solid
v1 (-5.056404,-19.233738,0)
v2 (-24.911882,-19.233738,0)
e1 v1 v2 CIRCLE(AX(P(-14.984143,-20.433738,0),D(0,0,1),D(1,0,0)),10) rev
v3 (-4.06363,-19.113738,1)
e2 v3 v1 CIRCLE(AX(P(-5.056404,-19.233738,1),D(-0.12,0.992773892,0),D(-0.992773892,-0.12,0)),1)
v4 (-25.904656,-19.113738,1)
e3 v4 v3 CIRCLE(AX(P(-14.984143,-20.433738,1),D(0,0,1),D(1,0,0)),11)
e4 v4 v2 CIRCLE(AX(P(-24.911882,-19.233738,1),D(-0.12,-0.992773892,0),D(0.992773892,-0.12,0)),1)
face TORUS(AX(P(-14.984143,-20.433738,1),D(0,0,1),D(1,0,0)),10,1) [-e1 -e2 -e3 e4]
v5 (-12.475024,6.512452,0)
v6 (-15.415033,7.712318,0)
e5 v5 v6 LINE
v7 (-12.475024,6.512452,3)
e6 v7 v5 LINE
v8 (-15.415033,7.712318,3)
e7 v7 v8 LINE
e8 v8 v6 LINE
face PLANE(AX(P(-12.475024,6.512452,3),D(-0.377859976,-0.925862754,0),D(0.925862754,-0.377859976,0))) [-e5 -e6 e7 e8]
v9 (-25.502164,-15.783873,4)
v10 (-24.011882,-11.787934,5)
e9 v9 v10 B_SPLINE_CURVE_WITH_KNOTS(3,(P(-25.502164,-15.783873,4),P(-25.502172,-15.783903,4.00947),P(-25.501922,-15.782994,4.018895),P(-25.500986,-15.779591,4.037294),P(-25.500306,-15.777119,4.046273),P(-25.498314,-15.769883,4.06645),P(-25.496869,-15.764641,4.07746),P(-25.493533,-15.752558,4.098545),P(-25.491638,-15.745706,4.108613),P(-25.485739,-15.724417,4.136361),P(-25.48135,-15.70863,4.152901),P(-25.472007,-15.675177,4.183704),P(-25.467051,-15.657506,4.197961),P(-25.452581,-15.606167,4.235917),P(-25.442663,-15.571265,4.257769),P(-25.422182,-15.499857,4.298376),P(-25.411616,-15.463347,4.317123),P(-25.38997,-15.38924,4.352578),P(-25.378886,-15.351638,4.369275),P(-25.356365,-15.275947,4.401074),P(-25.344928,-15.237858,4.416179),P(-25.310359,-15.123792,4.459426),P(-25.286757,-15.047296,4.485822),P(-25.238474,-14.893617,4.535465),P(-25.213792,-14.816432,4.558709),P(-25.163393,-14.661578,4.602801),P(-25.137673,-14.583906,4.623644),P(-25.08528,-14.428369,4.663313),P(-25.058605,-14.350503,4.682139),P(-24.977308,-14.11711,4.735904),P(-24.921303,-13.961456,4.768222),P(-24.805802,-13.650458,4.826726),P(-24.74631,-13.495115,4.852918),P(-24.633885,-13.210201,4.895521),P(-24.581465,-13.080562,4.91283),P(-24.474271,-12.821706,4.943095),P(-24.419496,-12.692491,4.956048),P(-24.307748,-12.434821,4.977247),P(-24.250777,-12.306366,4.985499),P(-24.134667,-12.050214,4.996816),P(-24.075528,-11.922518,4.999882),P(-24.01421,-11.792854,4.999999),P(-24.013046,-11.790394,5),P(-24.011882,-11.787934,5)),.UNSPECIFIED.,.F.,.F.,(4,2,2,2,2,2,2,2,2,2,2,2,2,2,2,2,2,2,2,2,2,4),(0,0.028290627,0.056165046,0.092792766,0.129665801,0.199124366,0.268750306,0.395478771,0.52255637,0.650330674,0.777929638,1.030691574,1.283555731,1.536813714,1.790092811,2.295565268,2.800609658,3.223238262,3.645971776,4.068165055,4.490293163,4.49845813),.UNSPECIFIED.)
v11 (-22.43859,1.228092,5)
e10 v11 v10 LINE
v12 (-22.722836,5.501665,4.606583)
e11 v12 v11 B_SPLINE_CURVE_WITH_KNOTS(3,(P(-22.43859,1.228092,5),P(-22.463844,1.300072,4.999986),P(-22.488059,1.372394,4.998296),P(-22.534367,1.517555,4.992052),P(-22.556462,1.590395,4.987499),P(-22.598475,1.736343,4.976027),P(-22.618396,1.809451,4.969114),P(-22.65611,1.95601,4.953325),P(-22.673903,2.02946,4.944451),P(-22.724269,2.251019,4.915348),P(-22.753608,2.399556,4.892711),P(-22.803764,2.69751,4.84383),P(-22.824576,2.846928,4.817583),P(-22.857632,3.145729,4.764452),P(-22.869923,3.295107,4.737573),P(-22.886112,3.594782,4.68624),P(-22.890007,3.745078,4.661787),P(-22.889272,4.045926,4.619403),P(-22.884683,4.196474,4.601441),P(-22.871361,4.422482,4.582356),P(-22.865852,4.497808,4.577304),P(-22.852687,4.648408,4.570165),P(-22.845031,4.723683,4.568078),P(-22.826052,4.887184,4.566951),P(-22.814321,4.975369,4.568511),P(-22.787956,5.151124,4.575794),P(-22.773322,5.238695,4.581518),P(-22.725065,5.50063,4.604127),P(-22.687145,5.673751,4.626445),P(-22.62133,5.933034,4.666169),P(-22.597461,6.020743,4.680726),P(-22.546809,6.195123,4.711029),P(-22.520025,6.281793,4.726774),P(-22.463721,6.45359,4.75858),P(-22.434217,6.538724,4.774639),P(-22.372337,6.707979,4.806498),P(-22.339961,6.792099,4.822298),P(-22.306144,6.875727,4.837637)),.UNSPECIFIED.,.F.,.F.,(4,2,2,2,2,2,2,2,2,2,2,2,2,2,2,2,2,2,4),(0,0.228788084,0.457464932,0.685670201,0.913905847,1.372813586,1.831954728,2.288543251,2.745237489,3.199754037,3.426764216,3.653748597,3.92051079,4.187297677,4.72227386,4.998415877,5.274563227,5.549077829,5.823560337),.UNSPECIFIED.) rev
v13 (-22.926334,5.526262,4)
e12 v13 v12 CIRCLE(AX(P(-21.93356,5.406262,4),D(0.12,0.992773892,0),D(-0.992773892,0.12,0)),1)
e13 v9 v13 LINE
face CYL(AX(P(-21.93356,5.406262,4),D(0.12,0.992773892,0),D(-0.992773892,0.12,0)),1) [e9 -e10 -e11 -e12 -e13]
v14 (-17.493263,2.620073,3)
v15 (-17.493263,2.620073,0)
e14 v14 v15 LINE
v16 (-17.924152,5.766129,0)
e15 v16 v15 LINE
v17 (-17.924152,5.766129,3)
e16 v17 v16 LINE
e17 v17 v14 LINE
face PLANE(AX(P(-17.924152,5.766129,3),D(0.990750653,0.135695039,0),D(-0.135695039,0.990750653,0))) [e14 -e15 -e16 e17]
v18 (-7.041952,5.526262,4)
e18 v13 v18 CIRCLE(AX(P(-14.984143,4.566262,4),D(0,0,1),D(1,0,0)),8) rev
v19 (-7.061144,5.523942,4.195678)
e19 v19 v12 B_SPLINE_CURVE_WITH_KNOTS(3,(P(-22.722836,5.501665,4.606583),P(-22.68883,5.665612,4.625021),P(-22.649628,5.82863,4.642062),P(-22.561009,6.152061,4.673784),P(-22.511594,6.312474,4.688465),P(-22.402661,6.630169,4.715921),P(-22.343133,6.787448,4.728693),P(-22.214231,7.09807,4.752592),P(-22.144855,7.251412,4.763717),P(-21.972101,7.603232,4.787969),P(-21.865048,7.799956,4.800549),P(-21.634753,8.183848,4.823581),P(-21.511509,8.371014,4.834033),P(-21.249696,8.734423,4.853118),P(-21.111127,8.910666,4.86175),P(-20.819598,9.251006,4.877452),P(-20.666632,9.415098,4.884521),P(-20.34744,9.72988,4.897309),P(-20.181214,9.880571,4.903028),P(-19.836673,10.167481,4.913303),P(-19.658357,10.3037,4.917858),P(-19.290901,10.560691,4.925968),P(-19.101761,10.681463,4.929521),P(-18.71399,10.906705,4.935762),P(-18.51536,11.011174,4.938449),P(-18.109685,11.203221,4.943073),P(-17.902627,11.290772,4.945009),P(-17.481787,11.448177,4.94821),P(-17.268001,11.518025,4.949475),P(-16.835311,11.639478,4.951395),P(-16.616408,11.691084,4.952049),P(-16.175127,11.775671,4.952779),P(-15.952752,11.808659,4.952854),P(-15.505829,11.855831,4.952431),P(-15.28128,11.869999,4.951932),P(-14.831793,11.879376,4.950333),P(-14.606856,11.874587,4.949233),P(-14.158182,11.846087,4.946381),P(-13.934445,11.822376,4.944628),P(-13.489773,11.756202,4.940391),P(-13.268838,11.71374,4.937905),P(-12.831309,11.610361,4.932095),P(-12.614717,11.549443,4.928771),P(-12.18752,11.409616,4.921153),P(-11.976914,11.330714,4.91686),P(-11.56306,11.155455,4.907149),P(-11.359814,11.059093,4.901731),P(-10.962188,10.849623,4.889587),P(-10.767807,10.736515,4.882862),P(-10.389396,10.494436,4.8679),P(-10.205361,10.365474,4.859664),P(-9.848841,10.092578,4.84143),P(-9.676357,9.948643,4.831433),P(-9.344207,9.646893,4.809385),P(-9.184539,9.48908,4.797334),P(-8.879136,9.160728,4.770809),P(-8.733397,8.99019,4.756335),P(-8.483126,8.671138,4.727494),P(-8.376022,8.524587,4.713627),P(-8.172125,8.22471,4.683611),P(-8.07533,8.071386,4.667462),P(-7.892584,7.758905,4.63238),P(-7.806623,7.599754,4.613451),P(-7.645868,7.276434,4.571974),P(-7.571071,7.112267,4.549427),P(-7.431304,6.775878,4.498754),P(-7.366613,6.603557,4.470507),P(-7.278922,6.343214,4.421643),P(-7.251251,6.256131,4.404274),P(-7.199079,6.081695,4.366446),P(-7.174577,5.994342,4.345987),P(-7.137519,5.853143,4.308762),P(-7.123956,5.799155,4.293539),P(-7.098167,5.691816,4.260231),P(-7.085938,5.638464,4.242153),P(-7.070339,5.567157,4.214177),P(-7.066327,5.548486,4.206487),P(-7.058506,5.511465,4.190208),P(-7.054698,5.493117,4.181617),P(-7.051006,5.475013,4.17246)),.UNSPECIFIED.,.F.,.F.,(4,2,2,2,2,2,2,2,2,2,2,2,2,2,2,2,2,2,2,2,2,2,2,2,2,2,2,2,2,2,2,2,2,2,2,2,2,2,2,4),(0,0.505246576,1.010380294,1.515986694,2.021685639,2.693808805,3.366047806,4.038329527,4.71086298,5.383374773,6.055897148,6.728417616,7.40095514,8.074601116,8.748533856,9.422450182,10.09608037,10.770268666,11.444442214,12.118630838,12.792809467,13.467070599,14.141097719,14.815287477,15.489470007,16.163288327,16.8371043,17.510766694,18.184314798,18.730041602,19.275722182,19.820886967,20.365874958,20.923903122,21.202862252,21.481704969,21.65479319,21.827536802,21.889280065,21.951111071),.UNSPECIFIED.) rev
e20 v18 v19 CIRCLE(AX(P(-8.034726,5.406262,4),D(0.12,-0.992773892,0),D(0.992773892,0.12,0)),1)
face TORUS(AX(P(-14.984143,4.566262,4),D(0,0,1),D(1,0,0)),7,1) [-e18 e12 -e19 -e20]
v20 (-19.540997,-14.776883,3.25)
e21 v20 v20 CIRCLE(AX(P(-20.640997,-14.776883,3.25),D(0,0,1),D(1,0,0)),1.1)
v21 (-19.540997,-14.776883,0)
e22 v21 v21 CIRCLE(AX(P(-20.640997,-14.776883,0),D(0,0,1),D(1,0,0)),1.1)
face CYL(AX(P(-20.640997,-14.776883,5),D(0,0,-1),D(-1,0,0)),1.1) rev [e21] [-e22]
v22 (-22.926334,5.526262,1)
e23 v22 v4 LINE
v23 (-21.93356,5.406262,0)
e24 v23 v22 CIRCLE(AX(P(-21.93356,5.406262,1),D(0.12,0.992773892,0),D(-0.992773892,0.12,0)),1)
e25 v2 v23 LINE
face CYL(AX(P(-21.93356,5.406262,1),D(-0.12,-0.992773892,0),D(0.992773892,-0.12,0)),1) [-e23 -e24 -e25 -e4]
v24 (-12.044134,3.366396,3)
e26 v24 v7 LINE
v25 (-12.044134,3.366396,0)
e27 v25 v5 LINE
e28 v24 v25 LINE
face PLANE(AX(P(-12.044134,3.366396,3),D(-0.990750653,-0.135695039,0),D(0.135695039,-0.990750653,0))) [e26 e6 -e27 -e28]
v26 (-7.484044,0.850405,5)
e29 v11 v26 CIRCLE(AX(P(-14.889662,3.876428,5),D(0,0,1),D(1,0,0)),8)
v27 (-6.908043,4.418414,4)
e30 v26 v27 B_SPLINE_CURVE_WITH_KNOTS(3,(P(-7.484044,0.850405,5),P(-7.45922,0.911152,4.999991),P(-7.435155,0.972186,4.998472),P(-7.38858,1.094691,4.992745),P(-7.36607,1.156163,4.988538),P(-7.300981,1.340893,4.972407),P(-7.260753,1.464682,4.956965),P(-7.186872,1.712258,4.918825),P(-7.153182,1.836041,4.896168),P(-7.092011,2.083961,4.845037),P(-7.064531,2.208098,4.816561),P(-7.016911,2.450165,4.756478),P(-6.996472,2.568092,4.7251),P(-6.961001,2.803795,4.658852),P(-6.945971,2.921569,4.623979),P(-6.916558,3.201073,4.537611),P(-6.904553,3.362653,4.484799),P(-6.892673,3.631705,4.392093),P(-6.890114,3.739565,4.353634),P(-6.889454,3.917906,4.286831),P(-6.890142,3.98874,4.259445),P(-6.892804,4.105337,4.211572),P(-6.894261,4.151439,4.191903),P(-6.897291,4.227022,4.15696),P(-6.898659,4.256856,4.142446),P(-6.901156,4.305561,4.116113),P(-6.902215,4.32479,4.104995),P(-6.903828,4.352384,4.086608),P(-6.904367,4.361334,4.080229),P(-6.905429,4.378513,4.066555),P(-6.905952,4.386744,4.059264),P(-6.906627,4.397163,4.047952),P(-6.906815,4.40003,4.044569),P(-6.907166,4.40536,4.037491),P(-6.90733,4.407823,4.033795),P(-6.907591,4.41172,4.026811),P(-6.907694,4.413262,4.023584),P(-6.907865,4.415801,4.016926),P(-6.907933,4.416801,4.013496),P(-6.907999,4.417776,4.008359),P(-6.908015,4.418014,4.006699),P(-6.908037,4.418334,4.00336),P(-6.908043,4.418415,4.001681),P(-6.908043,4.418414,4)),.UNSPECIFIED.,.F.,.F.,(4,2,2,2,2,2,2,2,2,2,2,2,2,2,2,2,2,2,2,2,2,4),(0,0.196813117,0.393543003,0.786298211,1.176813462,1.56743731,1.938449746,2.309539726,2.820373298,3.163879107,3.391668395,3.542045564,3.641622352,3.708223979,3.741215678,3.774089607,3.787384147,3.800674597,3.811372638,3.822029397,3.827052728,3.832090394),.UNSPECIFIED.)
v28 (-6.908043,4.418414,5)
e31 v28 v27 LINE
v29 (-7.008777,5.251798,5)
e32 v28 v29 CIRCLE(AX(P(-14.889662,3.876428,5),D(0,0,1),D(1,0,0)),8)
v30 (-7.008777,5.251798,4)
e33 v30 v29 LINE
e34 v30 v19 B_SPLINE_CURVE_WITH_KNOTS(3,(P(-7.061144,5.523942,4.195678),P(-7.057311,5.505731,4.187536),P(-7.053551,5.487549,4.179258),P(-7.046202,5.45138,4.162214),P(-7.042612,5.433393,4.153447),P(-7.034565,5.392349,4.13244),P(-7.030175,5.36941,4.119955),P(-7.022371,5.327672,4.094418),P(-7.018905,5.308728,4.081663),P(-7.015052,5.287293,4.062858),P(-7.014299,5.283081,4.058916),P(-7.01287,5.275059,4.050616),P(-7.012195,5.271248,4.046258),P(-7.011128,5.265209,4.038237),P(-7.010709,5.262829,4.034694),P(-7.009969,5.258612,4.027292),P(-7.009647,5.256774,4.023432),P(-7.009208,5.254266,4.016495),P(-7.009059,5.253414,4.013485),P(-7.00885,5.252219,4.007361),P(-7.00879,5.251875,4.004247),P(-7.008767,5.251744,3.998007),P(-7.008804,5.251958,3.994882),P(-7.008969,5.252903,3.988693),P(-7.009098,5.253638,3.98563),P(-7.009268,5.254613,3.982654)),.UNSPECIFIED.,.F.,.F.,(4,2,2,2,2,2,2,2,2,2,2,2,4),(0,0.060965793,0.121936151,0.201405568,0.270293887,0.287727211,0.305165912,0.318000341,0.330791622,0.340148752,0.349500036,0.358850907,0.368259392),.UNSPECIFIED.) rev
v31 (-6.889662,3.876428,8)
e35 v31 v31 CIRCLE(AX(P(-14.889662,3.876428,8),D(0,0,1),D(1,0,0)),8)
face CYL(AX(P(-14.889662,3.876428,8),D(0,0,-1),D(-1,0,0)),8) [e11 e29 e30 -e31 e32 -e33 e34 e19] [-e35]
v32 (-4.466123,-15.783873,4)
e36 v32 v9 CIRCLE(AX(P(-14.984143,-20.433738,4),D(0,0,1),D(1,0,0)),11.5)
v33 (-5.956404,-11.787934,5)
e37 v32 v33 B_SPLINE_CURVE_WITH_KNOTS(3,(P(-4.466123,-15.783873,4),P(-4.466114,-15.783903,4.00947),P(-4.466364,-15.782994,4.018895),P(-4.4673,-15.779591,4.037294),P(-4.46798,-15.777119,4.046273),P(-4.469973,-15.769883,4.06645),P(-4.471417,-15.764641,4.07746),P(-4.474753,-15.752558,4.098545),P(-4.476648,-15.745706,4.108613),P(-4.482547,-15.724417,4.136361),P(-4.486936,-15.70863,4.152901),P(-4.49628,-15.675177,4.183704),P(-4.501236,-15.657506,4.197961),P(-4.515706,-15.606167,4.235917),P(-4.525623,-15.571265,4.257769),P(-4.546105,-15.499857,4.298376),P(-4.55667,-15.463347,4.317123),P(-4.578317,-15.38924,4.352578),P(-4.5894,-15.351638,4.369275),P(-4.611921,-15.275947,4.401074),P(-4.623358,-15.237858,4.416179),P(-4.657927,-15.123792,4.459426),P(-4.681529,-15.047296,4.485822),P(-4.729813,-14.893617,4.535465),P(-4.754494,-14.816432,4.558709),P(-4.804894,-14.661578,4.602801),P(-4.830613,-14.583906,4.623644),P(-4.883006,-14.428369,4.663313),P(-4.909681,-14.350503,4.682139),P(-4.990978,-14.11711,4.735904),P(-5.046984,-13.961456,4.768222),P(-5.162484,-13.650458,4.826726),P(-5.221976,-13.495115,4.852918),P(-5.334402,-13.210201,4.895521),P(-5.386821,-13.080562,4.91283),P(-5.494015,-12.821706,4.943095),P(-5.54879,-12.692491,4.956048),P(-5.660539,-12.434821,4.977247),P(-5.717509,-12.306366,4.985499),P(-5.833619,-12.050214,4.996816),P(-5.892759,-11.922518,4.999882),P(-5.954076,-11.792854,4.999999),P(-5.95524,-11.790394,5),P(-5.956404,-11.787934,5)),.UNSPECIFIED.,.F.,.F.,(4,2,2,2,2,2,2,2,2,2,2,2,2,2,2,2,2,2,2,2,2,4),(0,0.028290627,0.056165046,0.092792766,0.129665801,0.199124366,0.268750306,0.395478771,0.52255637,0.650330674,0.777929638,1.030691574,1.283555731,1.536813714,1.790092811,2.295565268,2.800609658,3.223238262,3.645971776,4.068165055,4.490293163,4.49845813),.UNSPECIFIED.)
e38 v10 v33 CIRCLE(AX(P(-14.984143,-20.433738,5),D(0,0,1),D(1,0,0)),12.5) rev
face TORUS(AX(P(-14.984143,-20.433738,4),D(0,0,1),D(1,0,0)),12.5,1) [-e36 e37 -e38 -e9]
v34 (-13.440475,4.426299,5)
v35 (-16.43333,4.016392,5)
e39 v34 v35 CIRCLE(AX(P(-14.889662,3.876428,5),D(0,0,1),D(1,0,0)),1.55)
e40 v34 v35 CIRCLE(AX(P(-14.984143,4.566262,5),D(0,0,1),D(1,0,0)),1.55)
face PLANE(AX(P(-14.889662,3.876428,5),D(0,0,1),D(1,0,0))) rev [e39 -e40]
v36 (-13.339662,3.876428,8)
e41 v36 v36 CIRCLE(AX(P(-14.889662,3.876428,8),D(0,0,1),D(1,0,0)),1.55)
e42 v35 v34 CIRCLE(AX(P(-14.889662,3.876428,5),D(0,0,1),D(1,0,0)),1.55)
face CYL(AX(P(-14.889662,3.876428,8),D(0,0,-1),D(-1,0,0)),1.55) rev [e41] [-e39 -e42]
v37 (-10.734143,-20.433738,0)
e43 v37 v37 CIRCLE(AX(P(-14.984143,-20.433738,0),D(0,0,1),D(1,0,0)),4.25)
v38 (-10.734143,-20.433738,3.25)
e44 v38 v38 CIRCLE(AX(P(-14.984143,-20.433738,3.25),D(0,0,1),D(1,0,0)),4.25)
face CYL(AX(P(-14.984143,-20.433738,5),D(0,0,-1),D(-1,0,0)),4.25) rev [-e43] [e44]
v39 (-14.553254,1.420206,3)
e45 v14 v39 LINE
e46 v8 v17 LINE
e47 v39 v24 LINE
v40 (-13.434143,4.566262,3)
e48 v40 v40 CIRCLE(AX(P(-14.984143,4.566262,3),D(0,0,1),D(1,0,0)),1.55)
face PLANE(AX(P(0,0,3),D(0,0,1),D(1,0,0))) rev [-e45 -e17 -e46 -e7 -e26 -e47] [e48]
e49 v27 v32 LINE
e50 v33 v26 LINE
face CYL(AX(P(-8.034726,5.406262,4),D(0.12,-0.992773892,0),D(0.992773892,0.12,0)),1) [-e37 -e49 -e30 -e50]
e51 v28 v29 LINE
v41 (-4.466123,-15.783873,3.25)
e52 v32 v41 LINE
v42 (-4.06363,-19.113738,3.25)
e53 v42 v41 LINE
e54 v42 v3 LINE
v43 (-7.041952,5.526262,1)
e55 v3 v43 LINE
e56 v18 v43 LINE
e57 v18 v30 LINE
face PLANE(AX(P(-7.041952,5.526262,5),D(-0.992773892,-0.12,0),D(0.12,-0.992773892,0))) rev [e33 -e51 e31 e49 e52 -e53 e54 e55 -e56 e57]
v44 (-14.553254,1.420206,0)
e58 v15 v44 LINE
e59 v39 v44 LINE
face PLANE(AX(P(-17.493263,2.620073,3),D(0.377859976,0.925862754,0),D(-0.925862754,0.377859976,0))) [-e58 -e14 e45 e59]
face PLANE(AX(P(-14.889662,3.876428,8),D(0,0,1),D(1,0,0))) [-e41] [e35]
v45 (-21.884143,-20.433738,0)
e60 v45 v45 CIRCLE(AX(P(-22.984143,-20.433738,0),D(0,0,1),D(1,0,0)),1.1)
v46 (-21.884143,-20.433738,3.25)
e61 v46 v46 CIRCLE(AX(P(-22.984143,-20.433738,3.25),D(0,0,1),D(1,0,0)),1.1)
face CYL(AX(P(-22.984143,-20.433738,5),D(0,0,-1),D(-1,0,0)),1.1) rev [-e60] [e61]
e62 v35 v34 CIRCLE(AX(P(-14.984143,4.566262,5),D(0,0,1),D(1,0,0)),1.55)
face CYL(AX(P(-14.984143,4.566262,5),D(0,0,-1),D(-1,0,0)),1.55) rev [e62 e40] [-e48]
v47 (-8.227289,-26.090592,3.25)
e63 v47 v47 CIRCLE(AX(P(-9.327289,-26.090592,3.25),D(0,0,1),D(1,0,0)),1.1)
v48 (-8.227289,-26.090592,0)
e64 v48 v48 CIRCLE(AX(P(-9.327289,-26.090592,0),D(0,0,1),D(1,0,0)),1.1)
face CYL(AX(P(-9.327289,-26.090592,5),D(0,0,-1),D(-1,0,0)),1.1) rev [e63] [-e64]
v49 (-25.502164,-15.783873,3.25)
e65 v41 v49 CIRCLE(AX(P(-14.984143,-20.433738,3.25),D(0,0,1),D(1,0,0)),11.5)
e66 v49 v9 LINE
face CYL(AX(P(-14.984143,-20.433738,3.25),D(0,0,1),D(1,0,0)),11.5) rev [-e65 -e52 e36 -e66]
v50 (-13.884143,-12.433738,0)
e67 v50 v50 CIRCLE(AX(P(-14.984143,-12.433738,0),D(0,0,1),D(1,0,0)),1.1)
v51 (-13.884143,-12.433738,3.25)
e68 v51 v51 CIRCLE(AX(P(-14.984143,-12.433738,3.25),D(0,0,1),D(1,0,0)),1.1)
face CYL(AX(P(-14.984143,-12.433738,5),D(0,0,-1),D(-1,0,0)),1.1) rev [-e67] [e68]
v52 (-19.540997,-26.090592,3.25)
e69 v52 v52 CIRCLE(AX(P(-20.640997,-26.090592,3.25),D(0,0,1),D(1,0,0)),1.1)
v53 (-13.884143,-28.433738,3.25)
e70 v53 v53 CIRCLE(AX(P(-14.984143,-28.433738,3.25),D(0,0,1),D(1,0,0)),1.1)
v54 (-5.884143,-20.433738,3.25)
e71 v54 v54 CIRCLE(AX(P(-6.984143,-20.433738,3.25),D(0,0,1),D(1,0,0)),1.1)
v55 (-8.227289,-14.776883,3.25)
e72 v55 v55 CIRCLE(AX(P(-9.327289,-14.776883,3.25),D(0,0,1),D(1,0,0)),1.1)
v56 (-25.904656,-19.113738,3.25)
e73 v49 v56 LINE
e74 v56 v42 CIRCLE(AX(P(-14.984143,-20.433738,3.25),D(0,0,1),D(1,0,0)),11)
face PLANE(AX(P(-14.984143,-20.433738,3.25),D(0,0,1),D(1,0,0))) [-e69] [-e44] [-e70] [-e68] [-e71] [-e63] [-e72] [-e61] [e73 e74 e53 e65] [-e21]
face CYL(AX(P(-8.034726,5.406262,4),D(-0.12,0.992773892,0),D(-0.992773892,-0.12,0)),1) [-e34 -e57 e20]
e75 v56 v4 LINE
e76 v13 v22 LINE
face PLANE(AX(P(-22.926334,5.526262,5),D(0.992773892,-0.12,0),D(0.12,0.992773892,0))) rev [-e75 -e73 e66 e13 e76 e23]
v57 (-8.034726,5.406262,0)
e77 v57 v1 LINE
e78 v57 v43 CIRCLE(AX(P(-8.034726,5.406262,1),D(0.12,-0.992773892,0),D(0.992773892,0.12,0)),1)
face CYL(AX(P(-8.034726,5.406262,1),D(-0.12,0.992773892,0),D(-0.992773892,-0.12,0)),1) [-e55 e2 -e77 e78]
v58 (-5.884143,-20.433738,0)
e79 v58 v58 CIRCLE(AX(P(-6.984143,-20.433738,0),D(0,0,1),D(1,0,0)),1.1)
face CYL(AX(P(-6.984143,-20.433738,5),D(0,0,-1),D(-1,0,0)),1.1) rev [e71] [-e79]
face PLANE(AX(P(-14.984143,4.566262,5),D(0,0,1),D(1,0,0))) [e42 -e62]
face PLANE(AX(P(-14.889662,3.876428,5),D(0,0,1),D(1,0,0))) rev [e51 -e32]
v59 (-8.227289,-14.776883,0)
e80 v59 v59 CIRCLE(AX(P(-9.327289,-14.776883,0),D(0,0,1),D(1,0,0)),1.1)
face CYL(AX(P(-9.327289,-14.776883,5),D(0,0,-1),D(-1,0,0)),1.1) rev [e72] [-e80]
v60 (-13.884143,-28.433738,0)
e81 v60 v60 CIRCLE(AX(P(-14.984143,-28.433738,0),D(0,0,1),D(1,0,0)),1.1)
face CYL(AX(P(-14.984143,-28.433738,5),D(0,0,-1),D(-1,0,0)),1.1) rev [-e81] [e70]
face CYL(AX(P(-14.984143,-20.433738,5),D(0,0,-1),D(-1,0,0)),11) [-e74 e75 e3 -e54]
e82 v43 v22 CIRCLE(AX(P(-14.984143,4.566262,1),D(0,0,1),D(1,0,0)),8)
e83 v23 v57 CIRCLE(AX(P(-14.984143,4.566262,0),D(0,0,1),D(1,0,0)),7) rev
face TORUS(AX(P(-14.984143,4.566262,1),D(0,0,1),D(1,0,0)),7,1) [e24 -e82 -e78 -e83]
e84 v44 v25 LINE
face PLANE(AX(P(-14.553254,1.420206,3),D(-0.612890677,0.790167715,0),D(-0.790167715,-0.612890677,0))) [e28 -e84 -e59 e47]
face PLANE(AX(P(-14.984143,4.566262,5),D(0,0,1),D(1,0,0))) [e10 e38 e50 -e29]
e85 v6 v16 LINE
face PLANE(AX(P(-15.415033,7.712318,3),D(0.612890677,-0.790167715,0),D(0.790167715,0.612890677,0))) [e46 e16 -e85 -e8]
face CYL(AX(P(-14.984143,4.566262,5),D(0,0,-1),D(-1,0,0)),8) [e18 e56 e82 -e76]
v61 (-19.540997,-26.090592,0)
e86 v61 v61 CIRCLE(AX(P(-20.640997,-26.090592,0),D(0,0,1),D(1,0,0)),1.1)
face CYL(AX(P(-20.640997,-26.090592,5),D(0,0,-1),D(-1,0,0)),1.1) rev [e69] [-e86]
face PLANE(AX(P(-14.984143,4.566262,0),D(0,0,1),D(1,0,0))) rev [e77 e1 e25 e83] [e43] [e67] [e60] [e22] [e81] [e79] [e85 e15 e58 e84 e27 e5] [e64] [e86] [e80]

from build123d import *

# Parameters (mm, degrees)
SKETCH1_R           = 1.55
SKETCH1_R_2         = 4.25
SKETCH1_R_3         = 1.1
BOSS_EXTRUDE1_DEPTH = 5
SKETCH2_R           = 11.5
CUT_EXTRUDE1_DEPTH  = 1.75
CUT_EXTRUDE2_DEPTH  = 3
SKETCH5_R           = 8
SKETCH5_R_2         = 1.55
BOSS_EXTRUDE2_DEPTH = 3
FILLET1_R           = 1


with BuildPart() as part:
    # Sketch1 → Boss-Extrude1 (new body)
    with BuildSketch(Plane.XY):
        with BuildLine():
            Line((-22.926334266, 5.526262294), (-25.904655941, -19.113737706))
            ThreePointArc((-25.904655941, -19.113737706), (-14.984143133, -31.433737706), (-4.063630324, -19.113737706))
            Line((-4.063630324, -19.113737706), (-7.041951999, 5.526262294))
            ThreePointArc((-7.041951999, 5.526262294), (-14.984143133, 12.566262294), (-22.926334266, 5.526262294))
        make_face()
        with Locations((-14.984143133, 4.566262294)):
            Circle(SKETCH1_R, mode=Mode.SUBTRACT)
        with Locations((-14.984143133, -20.433737706)):
            Circle(SKETCH1_R_2, mode=Mode.SUBTRACT)
        with Locations((-6.984143133, -20.433737706)):
            Circle(SKETCH1_R_3, mode=Mode.SUBTRACT)
        with Locations((-9.327288883, -26.090591955)):
            Circle(SKETCH1_R_3, mode=Mode.SUBTRACT)
        with Locations((-14.984143133, -28.433737706)):
            Circle(SKETCH1_R_3, mode=Mode.SUBTRACT)
        with Locations((-20.640997382, -26.090591955)):
            Circle(SKETCH1_R_3, mode=Mode.SUBTRACT)
        with Locations((-22.984143133, -20.433737706)):
            Circle(SKETCH1_R_3, mode=Mode.SUBTRACT)
        with Locations((-20.640997382, -14.776883456)):
            Circle(SKETCH1_R_3, mode=Mode.SUBTRACT)
        with Locations((-14.984143133, -12.433737706)):
            Circle(SKETCH1_R_3, mode=Mode.SUBTRACT)
        with Locations((-9.327288883, -14.776883456)):
            Circle(SKETCH1_R_3, mode=Mode.SUBTRACT)
    extrude(amount=BOSS_EXTRUDE1_DEPTH)

    # Sketch2 → Cut-Extrude1 (cut)
    with BuildSketch(Plane.XY.offset(5)):
        with Locations((-14.984143133, -20.433737706)):
            Circle(SKETCH2_R)
    extrude(amount=-CUT_EXTRUDE1_DEPTH, mode=Mode.SUBTRACT)

    # Sketch3 → Cut-Extrude2 (cut)
    with BuildSketch(Plane.XY):
        Polygon((-15.415032752, 7.712318154), (-17.924152238, 5.766128868), (-17.493262619, 2.620073008), (-14.553253513, 1.420206435), (-12.044134027, 3.366395721), (-12.475023646, 6.512451581), align=None)
    extrude(amount=CUT_EXTRUDE2_DEPTH, mode=Mode.SUBTRACT)

    # Sketch5 → Boss-Extrude2 (add)
    with BuildSketch(Plane.XY.offset(5)):
        with Locations(Location((-14.88966218, 3.876428191, 0), (0, 0, 9.899538967))):
            Circle(SKETCH5_R)
        with Locations(Location((-14.88966218, 3.876428191, 0), (0, 0, 174.819185621))):
            Circle(SKETCH5_R_2, mode=Mode.SUBTRACT)
    extrude(amount=BOSS_EXTRUDE2_DEPTH)

    # Fillet1
    # the kernel refuses this fillet: 1 mm, written as the material it takes off along each edge
    with BuildSketch(Plane(origin=(-4.063630324, -19.113737706, 0), x_dir=(-0.9927738916792687, -0.11999999999999997, 0), z_dir=(-0.11999999999999997, 0.9927738916792685, 0))) as fillet1_piece_1:
        with BuildLine():
            CenterArc((FILLET1_R, FILLET1_R), FILLET1_R, 180, 90)
            Line((0, FILLET1_R), (0, 0))
            Line((0, 0), (FILLET1_R, 0))
        make_face()
    extrude(amount=24.819347292, mode=Mode.SUBTRACT)
    with BuildSketch(Plane(origin=(-14.984143133, -20.433737706, 0), x_dir=(-0.9927738916792687, 0.1199999999999997, 0), z_dir=(0.1199999999999997, 0.9927738916792687, 0))) as fillet1_piece_2:
        with BuildLine():
            CenterArc((11 - FILLET1_R, FILLET1_R), FILLET1_R, 270, 90)
            Line((11, FILLET1_R), (11, 0))
            Line((11, 0), (11 - FILLET1_R, 0))
        make_face()
    revolve(axis=Axis((-14.984143133, -20.433737706, 0), (0, 0, 1)), revolution_arc=193.784205159, mode=Mode.SUBTRACT)
    with BuildSketch(Plane(origin=(-14.984143133, -20.433737706, 5), x_dir=(0.980329402644487, 0.19736834171341458, 0), z_dir=(0.19736834171341458, -0.980329402644487, 0))) as fillet1_piece_3:
        with BuildLine():
            CenterArc((11.5 + FILLET1_R, -FILLET1_R), FILLET1_R, 90, 90)
            Line((11.5 + FILLET1_R, 0), (11.5, 0))
            Line((11.5, 0), (11.5, -FILLET1_R))
        make_face()
    revolve(axis=Axis((-14.984143133, -20.433737706, 5), (0, 0, 1)), revolution_arc=157.233782309, mode=Mode.SUBTRACT)
    with BuildSketch(Plane(origin=(-14.984143133, 4.566262294, 0), x_dir=(0.9927738916792685, 0.12000000000000052, 0), z_dir=(0.12000000000000052, -0.9927738916792685, 0))) as fillet1_piece_4:
        with BuildLine():
            CenterArc((8 - FILLET1_R, FILLET1_R), FILLET1_R, 270, 90)
            Line((8, FILLET1_R), (8, 0))
            Line((8, 0), (8 - FILLET1_R, 0))
        make_face()
    revolve(axis=Axis((-14.984143133, 4.566262294, 0), (0, 0, 1)), revolution_arc=166.215794841, mode=Mode.SUBTRACT)
    with BuildSketch(Plane(origin=(-22.926334266, 5.526262294, 0), x_dir=(0, 0, 1), z_dir=(-0.11999999999999994, -0.9927738916792685, 0))) as fillet1_piece_5:
        with BuildLine():
            CenterArc((FILLET1_R, -FILLET1_R), FILLET1_R, 90, 90)
            Line((0, -FILLET1_R), (0, 0))
            Line((0, 0), (FILLET1_R, 0))
        make_face()
    extrude(amount=24.819347292, mode=Mode.SUBTRACT)
    with BuildSketch(Plane(origin=(-4.16612256, -18.265807573, 5), x_dir=(-0.9927738916792687, -0.11999999999999998, 0), z_dir=(-0.11999999999999997, 0.9927738916792685, 0))) as fillet1_piece_6_section:
        with BuildLine():
            CenterArc((FILLET1_R, -FILLET1_R), FILLET1_R, 90, 90)
            Line((0, -FILLET1_R), (0, 0))
            Line((0, 0), (FILLET1_R, 0))
        make_face()
    fillet1_piece_6 = extrude(amount=25.349333785, mode=Mode.PRIVATE)
    fillet1_piece_6 = fillet1_piece_6 - Plane(origin=(-14.88966218, 3.876428191, 4.768901456), x_dir=(0.9851107095579202, 0.17192117354849282, 0), z_dir=(0, 0, -1)) * Cylinder(8, 55, mode=Mode.PRIVATE)
    add(fillet1_piece_6, mode=Mode.SUBTRACT)
    with BuildSketch(Plane(origin=(-6.708776504, 2.76986285, 5), x_dir=(-0.9927738916792687, -0.11999999999999998, 0), z_dir=(-0.11999999999999997, 0.9927738916792685, 0))) as fillet1_piece_7_section:
        with BuildLine():
            CenterArc((FILLET1_R, -FILLET1_R), FILLET1_R, 90, 90)
            Line((0, -FILLET1_R), (0, 0))
            Line((0, 0), (FILLET1_R, 0))
        make_face()
    fillet1_piece_7 = extrude(amount=2.776462463, mode=Mode.PRIVATE)
    fillet1_piece_7 = fillet1_piece_7 - Plane(origin=(-14.88966218, 3.876428191, 4.554846091), x_dir=(0.9851107095579202, 0.17192117354849282, 0), z_dir=(0, 0, -1)) * Cylinder(8, 10, mode=Mode.PRIVATE)
    add(fillet1_piece_7, mode=Mode.SUBTRACT)
    with BuildSketch(Plane(origin=(-22.926334266, 5.526262294, 5), x_dir=(0, 0, -1), z_dir=(-0.11999999999999994, -0.9927738916792685, 0))) as fillet1_piece_8_section:
        with BuildLine():
            CenterArc((FILLET1_R, FILLET1_R), FILLET1_R, 180, 90)
            Line((0, FILLET1_R), (0, 0))
            Line((0, 0), (FILLET1_R, 0))
        make_face()
    fillet1_piece_8 = extrude(amount=23.965245326, mode=Mode.PRIVATE)
    fillet1_piece_8 = fillet1_piece_8 - Plane(origin=(-14.88966218, 3.876428191, 4.768639771), x_dir=(0.9851107095579202, 0.17192117354849282, 0), z_dir=(0, 0, -1)) * Cylinder(8, 52, mode=Mode.PRIVATE)
    add(fillet1_piece_8, mode=Mode.SUBTRACT)
    with BuildSketch(Plane(origin=(-14.984143133, 4.566262294, 5), x_dir=(0.9927738916792685, 0.12000000000000052, 0), z_dir=(0.12000000000000052, -0.9927738916792685, 0))) as fillet1_piece_9_section:
        with BuildLine():
            CenterArc((8 - FILLET1_R, -FILLET1_R), FILLET1_R, 0, 90)
            Line((8, -FILLET1_R), (8, 0))
            Line((8, 0), (8 - FILLET1_R, 0))
        make_face()
    fillet1_piece_9 = revolve(axis=Axis((-14.984143133, 4.566262294, 5), (0, 0, 1)), revolution_arc=166.215794841, mode=Mode.PRIVATE)
    fillet1_piece_9 = fillet1_piece_9 - Plane(origin=(-14.88966218, 3.876428191, 4.59944893), x_dir=(0.9851107095579202, 0.17192117354849282, 0), z_dir=(0, 0, -1)) * Cylinder(8, 33, mode=Mode.PRIVATE)
    add(fillet1_piece_9, mode=Mode.SUBTRACT)


solid = part.part
